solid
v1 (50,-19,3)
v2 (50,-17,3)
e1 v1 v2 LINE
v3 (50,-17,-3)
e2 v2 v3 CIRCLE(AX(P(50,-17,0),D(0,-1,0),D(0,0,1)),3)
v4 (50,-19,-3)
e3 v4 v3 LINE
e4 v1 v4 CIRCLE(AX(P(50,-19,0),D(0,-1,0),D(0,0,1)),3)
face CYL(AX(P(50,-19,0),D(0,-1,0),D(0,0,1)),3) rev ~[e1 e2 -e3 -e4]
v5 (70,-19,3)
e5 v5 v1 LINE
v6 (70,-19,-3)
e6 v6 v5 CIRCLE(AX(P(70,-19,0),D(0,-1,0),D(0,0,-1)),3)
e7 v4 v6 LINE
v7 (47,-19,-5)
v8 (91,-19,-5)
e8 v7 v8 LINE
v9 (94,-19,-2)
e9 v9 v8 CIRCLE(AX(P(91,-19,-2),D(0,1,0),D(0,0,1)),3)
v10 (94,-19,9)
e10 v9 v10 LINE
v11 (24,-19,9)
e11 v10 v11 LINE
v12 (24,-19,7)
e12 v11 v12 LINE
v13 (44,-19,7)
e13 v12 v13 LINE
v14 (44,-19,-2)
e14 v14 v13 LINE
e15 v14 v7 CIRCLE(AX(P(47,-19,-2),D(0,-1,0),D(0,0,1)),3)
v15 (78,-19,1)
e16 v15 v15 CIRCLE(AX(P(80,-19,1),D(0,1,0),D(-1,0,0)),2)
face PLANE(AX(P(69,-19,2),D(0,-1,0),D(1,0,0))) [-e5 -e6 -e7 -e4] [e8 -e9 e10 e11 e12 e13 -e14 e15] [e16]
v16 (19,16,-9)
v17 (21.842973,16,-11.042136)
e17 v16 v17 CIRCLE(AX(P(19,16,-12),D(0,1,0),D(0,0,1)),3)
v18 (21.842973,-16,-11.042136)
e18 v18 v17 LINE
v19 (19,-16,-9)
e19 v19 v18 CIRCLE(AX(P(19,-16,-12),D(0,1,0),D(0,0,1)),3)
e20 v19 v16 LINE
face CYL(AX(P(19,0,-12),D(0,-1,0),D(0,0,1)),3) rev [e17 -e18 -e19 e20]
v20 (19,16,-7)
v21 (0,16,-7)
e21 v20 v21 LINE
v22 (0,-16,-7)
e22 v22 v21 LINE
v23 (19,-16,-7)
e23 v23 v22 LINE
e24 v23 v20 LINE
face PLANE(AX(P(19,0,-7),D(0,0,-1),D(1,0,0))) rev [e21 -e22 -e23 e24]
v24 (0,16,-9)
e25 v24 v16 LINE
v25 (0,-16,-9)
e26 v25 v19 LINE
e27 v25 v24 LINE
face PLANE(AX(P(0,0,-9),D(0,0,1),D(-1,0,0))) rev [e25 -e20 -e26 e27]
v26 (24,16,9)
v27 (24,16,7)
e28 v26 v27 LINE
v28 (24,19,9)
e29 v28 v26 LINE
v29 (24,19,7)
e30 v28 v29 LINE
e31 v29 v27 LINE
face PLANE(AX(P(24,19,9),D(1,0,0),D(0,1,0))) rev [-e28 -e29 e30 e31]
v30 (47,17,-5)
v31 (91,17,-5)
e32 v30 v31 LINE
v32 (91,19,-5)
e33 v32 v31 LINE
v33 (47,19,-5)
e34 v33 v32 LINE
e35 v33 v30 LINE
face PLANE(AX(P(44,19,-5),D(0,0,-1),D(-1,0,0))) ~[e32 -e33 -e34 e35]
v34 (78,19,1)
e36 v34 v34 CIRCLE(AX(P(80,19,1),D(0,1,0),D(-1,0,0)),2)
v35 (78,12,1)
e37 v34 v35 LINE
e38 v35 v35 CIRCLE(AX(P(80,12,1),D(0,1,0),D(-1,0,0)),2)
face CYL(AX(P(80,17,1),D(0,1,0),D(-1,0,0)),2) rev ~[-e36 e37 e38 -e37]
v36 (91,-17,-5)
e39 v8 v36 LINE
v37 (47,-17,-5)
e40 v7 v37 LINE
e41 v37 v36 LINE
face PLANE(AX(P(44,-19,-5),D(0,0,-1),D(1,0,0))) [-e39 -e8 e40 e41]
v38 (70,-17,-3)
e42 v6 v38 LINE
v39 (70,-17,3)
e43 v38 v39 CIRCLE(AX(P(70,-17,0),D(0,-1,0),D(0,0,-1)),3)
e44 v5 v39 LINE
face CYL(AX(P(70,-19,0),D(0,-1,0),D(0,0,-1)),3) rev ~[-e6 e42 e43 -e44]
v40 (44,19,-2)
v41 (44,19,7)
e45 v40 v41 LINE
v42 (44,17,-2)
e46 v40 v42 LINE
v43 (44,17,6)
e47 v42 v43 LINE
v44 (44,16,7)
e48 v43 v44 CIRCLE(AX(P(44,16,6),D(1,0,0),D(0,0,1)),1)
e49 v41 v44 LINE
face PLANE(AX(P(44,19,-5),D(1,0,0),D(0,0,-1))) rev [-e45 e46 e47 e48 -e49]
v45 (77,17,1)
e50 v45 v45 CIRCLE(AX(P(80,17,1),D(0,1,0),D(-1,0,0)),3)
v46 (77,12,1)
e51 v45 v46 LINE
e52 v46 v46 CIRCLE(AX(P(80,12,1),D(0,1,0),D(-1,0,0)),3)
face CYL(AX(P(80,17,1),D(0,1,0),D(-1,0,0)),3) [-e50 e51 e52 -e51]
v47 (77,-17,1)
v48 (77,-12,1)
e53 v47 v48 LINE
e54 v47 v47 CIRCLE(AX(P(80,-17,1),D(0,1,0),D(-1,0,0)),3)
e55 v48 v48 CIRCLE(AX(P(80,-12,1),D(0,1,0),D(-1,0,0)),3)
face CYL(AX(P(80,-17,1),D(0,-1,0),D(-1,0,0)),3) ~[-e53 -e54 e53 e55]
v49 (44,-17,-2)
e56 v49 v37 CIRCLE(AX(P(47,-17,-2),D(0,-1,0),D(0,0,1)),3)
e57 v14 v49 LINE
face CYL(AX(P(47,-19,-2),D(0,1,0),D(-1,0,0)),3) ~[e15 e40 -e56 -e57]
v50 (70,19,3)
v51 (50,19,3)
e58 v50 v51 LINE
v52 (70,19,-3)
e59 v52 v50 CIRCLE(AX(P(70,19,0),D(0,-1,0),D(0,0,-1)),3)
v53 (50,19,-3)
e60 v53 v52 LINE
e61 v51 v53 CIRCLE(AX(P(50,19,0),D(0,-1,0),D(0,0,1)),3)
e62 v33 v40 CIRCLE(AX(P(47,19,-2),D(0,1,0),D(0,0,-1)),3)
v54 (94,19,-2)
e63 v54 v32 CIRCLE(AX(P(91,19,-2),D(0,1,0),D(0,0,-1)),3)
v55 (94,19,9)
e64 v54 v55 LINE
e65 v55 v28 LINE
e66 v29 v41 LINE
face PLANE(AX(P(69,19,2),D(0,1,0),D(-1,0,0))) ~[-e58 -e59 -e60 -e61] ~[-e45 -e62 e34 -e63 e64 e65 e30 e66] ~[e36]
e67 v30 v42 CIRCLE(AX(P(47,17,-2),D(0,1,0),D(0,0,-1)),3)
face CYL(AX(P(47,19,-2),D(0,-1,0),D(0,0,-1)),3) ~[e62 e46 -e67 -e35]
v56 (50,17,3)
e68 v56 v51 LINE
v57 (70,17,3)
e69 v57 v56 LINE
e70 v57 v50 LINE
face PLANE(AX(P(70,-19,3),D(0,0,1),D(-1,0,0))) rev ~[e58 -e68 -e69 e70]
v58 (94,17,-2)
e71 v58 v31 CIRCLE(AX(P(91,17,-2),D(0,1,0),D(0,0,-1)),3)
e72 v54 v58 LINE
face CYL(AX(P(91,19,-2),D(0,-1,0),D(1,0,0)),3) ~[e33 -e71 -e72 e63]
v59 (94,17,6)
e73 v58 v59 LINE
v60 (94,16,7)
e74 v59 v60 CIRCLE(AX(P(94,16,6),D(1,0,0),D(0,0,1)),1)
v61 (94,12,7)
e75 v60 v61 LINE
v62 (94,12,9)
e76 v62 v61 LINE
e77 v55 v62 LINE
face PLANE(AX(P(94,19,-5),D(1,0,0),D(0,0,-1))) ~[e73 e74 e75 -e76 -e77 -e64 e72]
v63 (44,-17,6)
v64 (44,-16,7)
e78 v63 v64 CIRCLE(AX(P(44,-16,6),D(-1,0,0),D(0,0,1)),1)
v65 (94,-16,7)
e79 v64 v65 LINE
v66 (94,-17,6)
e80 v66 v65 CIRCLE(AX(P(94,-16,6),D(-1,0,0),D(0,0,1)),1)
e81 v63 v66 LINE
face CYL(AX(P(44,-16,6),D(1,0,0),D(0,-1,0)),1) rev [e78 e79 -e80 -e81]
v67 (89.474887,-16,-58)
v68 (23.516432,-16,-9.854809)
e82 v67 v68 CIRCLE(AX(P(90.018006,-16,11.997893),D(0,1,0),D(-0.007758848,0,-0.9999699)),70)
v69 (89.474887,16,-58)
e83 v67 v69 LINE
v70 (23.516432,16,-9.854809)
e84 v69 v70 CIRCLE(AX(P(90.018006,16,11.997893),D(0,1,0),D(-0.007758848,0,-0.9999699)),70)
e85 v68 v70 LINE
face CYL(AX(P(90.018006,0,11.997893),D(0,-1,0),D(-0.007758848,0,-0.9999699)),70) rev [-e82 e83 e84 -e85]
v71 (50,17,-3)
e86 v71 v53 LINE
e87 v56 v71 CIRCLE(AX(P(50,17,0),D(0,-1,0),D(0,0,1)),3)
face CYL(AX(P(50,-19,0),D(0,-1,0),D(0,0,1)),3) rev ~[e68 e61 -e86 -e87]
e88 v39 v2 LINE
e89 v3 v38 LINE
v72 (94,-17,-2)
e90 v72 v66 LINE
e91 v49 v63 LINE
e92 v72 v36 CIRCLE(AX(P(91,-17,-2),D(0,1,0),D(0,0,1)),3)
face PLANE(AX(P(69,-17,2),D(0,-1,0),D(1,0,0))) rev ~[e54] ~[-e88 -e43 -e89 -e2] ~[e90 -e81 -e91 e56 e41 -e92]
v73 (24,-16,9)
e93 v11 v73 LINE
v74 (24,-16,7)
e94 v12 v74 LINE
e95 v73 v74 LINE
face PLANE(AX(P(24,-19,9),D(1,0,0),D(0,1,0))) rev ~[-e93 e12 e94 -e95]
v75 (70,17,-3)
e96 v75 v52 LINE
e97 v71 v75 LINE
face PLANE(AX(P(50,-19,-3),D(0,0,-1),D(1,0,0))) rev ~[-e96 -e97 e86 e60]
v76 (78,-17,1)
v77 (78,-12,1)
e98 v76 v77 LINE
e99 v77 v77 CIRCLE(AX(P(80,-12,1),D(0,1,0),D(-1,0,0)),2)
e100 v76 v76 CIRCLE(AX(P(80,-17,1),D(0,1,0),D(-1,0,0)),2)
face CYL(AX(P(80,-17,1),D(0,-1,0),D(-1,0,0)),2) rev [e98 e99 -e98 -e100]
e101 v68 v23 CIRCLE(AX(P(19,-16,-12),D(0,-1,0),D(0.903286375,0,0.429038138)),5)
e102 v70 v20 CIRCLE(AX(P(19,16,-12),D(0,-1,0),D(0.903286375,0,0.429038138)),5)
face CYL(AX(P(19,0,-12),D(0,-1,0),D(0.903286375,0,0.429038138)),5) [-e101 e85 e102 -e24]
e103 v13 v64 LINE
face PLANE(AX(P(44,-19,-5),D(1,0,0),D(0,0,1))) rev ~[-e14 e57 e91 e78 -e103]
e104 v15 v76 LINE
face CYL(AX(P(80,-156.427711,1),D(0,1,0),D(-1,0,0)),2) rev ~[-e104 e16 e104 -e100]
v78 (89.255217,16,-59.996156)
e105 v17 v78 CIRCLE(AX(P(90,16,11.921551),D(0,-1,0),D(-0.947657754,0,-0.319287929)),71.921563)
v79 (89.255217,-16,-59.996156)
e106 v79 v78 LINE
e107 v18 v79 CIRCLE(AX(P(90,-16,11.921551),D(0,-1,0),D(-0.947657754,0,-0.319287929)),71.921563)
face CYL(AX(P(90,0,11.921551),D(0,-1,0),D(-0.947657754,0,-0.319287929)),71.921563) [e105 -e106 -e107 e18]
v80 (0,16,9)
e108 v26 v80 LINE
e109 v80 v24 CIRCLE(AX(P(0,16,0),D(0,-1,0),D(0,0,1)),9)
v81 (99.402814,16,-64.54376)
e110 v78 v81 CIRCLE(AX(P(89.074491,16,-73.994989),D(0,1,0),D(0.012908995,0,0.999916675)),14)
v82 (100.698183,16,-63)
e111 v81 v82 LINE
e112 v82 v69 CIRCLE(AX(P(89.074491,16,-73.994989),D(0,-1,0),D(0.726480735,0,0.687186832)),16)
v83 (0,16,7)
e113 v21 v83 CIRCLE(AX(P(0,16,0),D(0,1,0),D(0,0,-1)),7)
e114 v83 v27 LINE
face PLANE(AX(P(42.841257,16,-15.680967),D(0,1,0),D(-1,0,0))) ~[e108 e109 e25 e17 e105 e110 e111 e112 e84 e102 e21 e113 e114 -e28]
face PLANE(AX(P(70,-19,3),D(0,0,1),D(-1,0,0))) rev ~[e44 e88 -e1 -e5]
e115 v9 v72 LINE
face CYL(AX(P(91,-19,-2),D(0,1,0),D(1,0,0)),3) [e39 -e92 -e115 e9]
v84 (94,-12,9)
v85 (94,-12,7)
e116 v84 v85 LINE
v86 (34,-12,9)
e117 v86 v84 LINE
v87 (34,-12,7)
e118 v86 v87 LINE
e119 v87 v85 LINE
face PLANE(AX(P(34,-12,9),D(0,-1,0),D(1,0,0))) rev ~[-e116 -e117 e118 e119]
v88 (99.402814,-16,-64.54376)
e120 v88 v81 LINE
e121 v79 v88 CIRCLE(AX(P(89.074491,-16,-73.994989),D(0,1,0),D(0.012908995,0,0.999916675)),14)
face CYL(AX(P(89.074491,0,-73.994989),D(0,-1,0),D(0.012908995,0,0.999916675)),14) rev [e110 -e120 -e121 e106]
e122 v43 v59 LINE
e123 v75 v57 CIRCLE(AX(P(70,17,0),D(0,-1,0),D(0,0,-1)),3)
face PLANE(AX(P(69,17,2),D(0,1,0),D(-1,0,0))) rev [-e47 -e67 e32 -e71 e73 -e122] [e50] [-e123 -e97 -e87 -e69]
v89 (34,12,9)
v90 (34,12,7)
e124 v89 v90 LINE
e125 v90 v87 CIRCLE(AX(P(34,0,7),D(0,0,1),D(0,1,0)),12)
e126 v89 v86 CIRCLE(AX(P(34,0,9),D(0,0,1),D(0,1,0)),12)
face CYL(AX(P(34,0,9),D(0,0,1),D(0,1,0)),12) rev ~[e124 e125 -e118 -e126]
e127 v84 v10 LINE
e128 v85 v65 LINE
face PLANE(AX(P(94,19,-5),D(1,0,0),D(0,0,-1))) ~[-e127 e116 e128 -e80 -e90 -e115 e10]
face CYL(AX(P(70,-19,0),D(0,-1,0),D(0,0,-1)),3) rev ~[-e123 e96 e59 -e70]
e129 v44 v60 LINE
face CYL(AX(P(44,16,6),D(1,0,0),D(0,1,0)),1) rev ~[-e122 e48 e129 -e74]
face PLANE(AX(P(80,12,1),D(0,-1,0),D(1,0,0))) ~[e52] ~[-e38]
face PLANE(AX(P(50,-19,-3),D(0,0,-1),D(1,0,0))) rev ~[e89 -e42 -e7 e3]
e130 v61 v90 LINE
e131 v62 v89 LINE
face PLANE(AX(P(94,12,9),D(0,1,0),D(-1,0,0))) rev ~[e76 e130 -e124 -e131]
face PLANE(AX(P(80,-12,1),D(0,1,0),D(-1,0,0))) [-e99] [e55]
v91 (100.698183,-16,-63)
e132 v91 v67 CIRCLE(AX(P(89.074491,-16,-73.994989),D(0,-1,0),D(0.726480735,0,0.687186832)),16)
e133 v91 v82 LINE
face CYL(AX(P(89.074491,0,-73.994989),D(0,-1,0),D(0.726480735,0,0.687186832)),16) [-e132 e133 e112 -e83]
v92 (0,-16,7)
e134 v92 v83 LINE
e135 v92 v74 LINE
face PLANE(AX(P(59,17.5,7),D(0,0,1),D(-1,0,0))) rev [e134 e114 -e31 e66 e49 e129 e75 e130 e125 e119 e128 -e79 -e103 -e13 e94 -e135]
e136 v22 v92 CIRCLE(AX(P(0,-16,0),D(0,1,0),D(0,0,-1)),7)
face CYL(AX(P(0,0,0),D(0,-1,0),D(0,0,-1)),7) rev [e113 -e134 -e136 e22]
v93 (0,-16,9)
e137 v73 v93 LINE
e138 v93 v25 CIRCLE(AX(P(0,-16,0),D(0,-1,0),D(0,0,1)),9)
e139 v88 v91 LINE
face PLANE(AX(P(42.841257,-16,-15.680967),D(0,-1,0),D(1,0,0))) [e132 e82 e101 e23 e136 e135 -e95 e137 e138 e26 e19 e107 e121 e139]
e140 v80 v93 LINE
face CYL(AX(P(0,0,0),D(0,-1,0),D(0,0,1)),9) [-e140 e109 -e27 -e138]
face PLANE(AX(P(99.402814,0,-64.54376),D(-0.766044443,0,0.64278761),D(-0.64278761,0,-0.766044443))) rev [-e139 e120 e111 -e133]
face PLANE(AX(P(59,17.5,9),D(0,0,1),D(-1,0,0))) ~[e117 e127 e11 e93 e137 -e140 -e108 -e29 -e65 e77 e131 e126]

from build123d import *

# Parameters (mm, degrees)
F1_DEPTH  = 16
F2_W      = 70
F2_H      = 3
F3_DEPTH  = 2
F4_W      = 50
F4_H      = 14
F5_DEPTH  = 2
F6_R      = 1
F9_DEPTH  = 2
F11_DEPTH = 38.001
F13_D     = 4
F14_R     = 3
F14_R_2   = 2
F15_DEPTH = 5
F16_R     = 3


# Not quite as in the source:
# - a pattern or mirror of a feature is missing from the dataset's text; its kind, count and spacing are read off the source's solid


with BuildPart() as f1:
    # F0 (on Front) → F1 (new body)
    with BuildSketch(Plane.XZ):
        with BuildLine():
            Line((94, 9), (0, 9))
            ThreePointArc((0, 9), (-9, 0), (0, -9))
            Line((0, -9), (19, -9))
            ThreePointArc((19, -9), (20.7502012229, -9.5634459417), (21.8429732618, -11.0421362138))
            ThreePointArc((21.8429732618, -11.0421362138), (47.7390385011, -46.2740019539), (89.2552166837, -59.996155849))
            ThreePointArc((89.2552166837, -59.996155849), (94.7998907394, -61.2192390349), (99.4028141151, -64.5437599417))
            Line((99.4028141151, -64.5437599417), (100.6981825128, -63))
            ThreePointArc((100.6981825128, -63), (95.5856099225, -59.3797463332), (89.4748869571, -58))
            ThreePointArc((89.4748869571, -58), (48.7477072094, -44.5420257674), (23.5164318764, -9.8548093079))
            ThreePointArc((23.5164318764, -9.8548093079), (21.6715207784, -7.7735385095), (19, -7))
            Line((19, -7), (0, -7))
            ThreePointArc((0, -7), (-7, 0), (0, 7))
            Line((0, 7), (94, 7))
            Line((94, 7), (94, 9))
        make_face()
    extrude(amount=F1_DEPTH)

    # F2 (on face) → F3 (join)
    with BuildSketch(Plane.XY.offset(9)):
        with Locations((59, -17.5)):
            Rectangle(F2_W, F2_H)
    extrude(amount=-F3_DEPTH)

    # F4 (on face) → F5 (join)
    with BuildSketch(Plane.XZ.offset(19)):
        with Locations((69, 2)):
            Rectangle(F4_W, F4_H)
    extrude(amount=-F5_DEPTH)

    # F6
    f6_edges = [f1.edges().sort_by_distance(p)[0] for p in [
        (69, -17, 7),
    ]]
    fillet(f6_edges, radius=F6_R)

    # F7: F1 across plane


with BuildPart() as f1_1:
    add(f1.part)
    add(f1.part.mirror(Plane.XZ))

    # F8 (on face) → F9 (cut)
    with BuildSketch(Plane.XY.offset(9)):
        with BuildLine():
            Line((94, 12), (34, 12))
            ThreePointArc((34, 12), (22, 0), (34, -12))
            Line((34, -12), (94, -12))
            Line((94, -12), (94, 12))
        make_face()
    extrude(amount=-F9_DEPTH, mode=Mode.SUBTRACT)

    # F10 (on face) → F11 (cut, through all)
    with BuildSketch(Plane.XZ.offset(19)):
        with BuildLine():
            ThreePointArc((50, 3), (47, 0), (50, -3))
            Line((50, -3), (70, -3))
            ThreePointArc((70, -3), (73, 0), (70, 3))
            Line((70, 3), (50, 3))
        make_face()
    extrude(amount=-F11_DEPTH, mode=Mode.SUBTRACT)

    # F13 (through all)
    with Locations(Plane.XZ.offset(19)):
        with Locations((80, 1)):
            Hole(F13_D / 2)

    # F14 (on face) → F15 (join)
    with BuildSketch(Plane(origin=(0, -17, 0), x_dir=(-1, 0, 0), z_dir=(0, 1, 0))):
        with Locations((-80, 1)):
            Circle(F14_R)
        with Locations((-80, 1)):
            Circle(F14_R_2, mode=Mode.SUBTRACT)
    f15 = extrude(amount=F15_DEPTH)

    # F15_copies: F15 across plane
    add(f15.mirror(Plane.ZX))

    # F16
    f16_edges = [f1_1.edges().sort_by_distance(p)[0] for p in [
        (94, -18, -5),
        (44, -18, -5),
        (94, 18, -5),
        (44, 18, -5),
    ]]
    fillet(f16_edges, radius=F16_R)


solid = f1_1.part
